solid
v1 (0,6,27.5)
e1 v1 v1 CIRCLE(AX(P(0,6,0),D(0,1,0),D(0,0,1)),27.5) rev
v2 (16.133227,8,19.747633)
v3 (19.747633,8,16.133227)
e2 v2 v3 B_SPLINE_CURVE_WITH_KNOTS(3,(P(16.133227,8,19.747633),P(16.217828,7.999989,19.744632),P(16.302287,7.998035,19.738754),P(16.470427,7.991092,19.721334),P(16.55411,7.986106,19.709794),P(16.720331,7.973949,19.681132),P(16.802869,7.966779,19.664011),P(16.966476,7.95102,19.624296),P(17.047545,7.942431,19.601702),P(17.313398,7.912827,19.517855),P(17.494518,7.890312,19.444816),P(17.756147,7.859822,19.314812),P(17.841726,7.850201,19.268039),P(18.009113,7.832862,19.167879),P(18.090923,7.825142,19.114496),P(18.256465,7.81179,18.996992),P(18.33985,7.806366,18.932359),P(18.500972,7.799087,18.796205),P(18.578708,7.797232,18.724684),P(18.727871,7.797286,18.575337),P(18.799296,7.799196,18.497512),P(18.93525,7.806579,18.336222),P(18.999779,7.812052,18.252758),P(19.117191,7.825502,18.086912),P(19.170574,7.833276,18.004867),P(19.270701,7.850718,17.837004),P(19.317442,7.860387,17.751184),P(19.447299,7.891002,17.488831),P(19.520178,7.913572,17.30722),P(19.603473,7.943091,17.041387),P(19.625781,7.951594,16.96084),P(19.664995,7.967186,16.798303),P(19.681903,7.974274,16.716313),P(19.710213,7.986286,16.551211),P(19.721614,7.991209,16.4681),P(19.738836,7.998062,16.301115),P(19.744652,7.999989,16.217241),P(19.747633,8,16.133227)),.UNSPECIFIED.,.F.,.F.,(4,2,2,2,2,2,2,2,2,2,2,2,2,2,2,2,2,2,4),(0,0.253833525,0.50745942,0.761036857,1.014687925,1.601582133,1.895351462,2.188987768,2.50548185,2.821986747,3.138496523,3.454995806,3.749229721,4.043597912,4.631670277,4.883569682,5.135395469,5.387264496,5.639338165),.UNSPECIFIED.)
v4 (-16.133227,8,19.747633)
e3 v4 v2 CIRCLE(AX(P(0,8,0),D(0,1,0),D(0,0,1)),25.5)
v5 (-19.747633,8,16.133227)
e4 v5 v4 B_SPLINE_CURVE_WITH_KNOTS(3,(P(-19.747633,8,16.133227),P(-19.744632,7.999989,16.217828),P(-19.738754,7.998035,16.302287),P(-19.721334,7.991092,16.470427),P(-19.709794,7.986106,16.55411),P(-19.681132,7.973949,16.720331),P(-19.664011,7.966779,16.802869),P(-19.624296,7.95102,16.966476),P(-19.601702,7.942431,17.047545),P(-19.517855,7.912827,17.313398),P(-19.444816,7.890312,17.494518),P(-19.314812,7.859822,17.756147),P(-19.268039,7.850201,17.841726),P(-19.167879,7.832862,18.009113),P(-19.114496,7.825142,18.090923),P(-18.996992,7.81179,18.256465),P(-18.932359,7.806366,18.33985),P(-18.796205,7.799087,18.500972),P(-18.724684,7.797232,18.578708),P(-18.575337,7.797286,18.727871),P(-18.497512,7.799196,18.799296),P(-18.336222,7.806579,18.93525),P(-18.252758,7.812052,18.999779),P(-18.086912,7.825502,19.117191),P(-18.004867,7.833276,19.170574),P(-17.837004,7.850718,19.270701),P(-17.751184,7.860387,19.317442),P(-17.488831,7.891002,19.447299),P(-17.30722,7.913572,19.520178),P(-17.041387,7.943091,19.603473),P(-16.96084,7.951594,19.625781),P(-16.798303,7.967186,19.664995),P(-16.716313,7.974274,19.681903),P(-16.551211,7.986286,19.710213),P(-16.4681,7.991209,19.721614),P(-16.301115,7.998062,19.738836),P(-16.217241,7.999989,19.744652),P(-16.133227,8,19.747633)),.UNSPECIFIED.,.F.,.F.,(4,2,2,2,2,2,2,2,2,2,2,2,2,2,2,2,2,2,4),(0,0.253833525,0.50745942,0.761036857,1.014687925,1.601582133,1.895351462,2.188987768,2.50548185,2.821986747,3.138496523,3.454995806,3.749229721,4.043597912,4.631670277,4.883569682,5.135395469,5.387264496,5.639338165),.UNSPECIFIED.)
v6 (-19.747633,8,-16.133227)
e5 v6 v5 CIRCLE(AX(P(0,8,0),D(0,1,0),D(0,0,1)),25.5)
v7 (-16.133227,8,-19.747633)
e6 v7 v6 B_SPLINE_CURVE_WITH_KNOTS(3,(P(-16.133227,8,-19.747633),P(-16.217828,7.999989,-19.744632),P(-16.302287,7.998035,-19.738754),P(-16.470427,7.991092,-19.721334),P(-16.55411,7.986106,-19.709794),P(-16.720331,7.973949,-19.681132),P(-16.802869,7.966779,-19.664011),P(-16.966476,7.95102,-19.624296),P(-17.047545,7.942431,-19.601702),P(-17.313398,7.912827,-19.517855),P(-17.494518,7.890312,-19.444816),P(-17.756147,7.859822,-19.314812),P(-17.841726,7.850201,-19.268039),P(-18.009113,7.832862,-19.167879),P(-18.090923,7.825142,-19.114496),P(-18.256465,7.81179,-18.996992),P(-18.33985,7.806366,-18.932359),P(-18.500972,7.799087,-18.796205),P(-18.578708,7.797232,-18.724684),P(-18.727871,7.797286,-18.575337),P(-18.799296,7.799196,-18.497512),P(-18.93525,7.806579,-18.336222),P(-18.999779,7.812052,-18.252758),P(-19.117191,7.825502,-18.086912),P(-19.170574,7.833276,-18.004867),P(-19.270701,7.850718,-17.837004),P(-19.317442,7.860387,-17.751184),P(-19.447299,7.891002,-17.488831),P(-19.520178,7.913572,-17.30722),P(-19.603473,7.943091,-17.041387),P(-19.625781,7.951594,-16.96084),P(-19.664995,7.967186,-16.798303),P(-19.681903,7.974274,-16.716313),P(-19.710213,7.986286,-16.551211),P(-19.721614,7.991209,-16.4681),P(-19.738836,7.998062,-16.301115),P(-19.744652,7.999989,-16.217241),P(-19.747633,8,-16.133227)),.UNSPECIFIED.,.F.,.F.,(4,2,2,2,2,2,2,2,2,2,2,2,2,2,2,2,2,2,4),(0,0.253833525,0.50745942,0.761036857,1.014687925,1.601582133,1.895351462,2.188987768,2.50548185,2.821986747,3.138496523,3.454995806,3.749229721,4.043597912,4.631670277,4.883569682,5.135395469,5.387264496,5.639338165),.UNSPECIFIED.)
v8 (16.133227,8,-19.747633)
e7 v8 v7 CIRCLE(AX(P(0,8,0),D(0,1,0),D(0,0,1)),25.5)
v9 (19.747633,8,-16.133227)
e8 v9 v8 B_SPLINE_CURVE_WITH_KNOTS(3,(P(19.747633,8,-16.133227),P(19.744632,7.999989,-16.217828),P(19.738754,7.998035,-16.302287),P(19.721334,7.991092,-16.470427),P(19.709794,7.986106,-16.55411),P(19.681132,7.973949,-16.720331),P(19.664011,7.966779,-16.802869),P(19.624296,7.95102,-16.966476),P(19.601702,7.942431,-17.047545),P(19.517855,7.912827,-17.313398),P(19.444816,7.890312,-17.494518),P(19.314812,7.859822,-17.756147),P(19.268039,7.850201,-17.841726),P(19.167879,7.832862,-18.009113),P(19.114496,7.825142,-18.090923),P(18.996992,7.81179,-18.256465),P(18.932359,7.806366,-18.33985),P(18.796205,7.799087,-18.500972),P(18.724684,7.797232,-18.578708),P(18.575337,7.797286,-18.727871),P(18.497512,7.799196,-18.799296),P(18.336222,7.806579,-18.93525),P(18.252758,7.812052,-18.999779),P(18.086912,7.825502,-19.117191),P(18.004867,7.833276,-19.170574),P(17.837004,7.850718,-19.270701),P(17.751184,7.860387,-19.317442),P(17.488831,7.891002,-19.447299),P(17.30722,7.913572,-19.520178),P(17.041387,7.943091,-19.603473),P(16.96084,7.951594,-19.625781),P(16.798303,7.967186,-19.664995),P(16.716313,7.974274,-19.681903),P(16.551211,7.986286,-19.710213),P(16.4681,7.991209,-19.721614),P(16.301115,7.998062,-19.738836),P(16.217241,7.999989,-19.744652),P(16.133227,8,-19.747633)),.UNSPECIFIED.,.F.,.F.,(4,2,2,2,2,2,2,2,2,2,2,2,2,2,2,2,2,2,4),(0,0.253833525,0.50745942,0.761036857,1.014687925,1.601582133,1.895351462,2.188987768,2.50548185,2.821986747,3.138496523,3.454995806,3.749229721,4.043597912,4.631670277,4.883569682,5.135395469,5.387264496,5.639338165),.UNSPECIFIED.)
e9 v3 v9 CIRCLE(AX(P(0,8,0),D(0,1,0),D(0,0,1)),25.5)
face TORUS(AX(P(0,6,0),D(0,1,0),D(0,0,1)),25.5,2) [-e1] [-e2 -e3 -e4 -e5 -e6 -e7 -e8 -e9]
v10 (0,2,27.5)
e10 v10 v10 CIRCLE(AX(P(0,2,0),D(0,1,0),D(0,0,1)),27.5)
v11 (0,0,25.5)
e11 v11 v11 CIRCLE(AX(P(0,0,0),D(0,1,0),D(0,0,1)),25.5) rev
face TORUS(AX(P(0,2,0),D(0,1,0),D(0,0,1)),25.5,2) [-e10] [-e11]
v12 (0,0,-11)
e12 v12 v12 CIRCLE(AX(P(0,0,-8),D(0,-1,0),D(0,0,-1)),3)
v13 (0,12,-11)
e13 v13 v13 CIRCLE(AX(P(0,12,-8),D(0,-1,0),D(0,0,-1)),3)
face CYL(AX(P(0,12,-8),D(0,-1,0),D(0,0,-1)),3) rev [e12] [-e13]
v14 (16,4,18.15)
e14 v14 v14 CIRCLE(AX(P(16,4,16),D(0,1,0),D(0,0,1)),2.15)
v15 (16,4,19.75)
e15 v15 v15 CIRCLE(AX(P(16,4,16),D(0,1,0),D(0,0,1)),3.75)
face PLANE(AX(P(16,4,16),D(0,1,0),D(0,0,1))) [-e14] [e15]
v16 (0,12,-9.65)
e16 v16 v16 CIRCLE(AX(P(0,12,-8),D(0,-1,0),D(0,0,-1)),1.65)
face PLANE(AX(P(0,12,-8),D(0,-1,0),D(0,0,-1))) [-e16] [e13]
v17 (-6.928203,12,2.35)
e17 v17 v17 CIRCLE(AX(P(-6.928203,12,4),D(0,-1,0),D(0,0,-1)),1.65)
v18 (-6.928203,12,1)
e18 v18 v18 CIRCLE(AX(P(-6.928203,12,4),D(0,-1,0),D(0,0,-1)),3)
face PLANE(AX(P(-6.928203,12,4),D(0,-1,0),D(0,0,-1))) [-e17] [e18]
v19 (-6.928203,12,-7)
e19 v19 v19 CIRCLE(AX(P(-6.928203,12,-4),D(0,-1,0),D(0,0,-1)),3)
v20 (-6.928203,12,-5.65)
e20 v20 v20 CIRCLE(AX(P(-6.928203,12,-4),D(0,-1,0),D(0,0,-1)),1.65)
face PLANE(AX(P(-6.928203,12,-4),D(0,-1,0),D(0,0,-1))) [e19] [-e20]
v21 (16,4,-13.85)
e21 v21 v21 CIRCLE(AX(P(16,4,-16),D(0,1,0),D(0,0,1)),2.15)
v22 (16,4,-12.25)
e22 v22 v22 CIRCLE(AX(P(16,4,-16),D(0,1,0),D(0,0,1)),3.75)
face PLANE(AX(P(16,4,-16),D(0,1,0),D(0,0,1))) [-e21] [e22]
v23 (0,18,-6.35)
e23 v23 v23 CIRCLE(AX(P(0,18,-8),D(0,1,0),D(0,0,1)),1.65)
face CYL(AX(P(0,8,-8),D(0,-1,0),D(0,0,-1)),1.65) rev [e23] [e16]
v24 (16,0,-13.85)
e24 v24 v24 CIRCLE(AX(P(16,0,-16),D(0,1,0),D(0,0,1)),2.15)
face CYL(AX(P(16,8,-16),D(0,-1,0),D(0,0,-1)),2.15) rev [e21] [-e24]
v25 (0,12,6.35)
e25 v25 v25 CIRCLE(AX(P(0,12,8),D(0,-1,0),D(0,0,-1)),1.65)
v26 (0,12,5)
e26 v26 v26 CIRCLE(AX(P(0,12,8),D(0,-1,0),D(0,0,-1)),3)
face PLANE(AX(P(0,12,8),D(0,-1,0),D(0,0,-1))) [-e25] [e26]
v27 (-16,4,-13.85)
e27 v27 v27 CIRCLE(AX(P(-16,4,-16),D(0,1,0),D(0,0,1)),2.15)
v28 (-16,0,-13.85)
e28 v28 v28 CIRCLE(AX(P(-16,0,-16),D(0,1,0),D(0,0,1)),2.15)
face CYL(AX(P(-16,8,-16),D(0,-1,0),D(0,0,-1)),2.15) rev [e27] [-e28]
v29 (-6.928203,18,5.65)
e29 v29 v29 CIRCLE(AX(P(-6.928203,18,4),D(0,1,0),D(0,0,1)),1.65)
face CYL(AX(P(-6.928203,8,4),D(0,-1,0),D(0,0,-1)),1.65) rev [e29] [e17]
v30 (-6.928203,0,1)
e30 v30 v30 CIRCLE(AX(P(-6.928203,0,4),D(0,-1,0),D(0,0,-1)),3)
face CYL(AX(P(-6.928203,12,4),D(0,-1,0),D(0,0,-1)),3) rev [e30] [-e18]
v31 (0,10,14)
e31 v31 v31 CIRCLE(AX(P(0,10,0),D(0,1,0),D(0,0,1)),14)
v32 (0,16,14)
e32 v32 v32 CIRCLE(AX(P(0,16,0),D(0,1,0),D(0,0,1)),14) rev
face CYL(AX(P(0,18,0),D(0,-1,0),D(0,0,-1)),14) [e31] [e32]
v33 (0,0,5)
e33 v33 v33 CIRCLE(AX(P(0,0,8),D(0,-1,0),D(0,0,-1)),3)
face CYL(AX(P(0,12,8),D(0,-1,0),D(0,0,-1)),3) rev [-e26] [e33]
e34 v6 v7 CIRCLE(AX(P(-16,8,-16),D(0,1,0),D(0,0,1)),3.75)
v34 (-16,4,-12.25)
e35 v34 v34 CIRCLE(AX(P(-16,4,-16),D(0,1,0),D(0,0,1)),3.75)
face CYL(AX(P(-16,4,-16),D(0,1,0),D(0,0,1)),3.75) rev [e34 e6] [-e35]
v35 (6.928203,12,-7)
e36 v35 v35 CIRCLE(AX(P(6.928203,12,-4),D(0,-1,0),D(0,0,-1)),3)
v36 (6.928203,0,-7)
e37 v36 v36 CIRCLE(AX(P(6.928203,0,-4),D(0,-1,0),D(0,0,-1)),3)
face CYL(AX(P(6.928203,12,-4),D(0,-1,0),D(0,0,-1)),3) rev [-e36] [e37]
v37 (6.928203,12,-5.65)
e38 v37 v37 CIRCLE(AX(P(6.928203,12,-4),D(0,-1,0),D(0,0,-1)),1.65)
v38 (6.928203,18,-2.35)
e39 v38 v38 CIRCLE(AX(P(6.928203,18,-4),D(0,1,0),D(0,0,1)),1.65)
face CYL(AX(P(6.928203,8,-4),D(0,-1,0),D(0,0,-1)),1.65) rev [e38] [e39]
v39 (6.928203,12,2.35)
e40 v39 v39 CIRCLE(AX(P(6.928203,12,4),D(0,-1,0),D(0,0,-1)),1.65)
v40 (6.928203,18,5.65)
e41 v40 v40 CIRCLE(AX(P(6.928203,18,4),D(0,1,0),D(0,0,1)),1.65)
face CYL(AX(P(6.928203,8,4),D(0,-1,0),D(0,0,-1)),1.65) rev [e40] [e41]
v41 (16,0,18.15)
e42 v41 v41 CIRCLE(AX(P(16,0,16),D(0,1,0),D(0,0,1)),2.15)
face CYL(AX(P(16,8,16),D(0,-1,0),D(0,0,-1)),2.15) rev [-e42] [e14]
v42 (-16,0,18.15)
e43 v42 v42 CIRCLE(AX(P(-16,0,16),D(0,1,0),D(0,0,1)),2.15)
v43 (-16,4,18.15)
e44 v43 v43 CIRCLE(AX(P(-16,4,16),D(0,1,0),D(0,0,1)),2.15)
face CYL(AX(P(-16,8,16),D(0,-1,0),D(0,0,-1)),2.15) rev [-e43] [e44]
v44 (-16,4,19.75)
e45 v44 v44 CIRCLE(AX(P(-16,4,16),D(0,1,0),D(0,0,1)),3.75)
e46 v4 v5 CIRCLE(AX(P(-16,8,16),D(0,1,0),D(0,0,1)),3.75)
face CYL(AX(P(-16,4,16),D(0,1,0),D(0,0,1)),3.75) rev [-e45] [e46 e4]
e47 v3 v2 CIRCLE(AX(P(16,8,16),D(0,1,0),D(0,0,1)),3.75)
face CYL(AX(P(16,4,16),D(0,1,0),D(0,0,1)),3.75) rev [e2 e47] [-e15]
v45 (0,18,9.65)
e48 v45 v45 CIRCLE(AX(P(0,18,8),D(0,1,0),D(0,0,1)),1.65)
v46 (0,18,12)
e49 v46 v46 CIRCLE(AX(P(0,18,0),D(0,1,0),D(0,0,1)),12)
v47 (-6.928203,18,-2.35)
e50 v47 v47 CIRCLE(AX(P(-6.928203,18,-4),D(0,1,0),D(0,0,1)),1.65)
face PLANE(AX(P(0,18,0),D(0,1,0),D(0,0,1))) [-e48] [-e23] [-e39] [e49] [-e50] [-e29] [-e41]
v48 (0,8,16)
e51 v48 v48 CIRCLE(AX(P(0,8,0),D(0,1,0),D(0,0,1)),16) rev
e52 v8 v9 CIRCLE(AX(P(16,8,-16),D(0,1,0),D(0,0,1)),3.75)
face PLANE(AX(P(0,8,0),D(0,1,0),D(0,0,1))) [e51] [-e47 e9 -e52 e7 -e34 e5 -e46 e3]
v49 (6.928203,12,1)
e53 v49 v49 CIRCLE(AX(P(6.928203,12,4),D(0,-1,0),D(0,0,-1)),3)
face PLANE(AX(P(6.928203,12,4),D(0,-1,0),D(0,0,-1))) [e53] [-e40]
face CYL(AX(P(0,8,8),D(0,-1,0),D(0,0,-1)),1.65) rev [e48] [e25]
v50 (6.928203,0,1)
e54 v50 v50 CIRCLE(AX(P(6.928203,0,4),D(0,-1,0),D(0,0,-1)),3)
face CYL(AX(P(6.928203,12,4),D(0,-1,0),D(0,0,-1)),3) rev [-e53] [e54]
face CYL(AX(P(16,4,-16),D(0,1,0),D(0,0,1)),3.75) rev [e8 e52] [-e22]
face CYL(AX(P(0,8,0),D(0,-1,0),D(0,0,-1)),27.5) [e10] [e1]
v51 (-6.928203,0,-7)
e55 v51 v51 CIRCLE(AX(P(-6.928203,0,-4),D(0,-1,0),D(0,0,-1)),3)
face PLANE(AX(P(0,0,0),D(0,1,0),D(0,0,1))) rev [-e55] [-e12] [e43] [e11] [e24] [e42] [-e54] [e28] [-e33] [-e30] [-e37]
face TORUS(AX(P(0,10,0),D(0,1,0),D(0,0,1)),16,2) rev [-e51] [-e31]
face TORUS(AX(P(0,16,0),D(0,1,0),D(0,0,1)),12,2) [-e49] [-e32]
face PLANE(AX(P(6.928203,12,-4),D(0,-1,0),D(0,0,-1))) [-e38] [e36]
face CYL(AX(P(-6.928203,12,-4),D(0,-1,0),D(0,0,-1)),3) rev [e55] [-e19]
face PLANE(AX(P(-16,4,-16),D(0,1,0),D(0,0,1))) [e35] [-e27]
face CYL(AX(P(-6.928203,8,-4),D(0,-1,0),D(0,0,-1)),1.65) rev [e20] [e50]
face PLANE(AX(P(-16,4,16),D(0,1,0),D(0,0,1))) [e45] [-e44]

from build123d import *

# Parameters (mm, degrees)
SKETCH1_R           = 27.5
SKETCH1_R_2         = 1.65
SKETCH1_R_3         = 2.15
BOSS_EXTRUDE1_DEPTH = 8
SKETCH2_R           = 14
SKETCH2_R_2         = 1.65
BOSS_EXTRUDE2_DEPTH = 10
SKETCH3_R           = 3
CUT_EXTRUDE1_DEPTH  = 12
SKETCH4_R           = 3.75
CUT_EXTRUDE2_DEPTH  = 4
FILLET1_R           = 2


with BuildPart() as part:
    # Sketch1 → Boss-Extrude1 (new body)
    with BuildSketch(Plane(origin=(0, 0, 0), x_dir=(1, 0, 0), z_dir=(0, 1, 0))):
        with Locations(Location((0, 0, 0), (0, 0, 270))):
            Circle(SKETCH1_R)
        with Locations(Location((-6.92820323, 4, 0), (0, 0, 270))):
            Circle(SKETCH1_R_2, mode=Mode.SUBTRACT)
        with Locations(Location((0, 8, 0), (0, 0, 270))):
            Circle(SKETCH1_R_2, mode=Mode.SUBTRACT)
        with Locations(Location((6.92820323, 4, 0), (0, 0, 270))):
            Circle(SKETCH1_R_2, mode=Mode.SUBTRACT)
        with Locations(Location((6.92820323, -4, 0), (0, 0, 270))):
            Circle(SKETCH1_R_2, mode=Mode.SUBTRACT)
        with Locations(Location((0, -8, 0), (0, 0, 270))):
            Circle(SKETCH1_R_2, mode=Mode.SUBTRACT)
        with Locations(Location((-6.92820323, -4, 0), (0, 0, 270))):
            Circle(SKETCH1_R_2, mode=Mode.SUBTRACT)
        with Locations(Location((-16, 16, 0), (0, 0, 270))):
            Circle(SKETCH1_R_3, mode=Mode.SUBTRACT)
        with Locations(Location((16, 16, 0), (0, 0, 270))):
            Circle(SKETCH1_R_3, mode=Mode.SUBTRACT)
        with Locations(Location((16, -16, 0), (0, 0, 270))):
            Circle(SKETCH1_R_3, mode=Mode.SUBTRACT)
        with Locations(Location((-16, -16, 0), (0, 0, 270))):
            Circle(SKETCH1_R_3, mode=Mode.SUBTRACT)
    extrude(amount=BOSS_EXTRUDE1_DEPTH)

    # Sketch2 → Boss-Extrude2 (add)
    with BuildSketch(Plane(origin=(0, 8, 0), x_dir=(1, 0, 0), z_dir=(0, 1, 0))):
        with Locations(Location((0, 0, 0), (0, 0, 270))):
            Circle(SKETCH2_R)
        with Locations(Location((-6.92820323, -4, 0), (0, 0, 270))):
            Circle(SKETCH2_R_2, mode=Mode.SUBTRACT)
        with Locations(Location((0, -8, 0), (0, 0, 270))):
            Circle(SKETCH2_R_2, mode=Mode.SUBTRACT)
        with Locations(Location((6.92820323, -4, 0), (0, 0, 270))):
            Circle(SKETCH2_R_2, mode=Mode.SUBTRACT)
        with Locations(Location((6.92820323, 4, 0), (0, 0, 270))):
            Circle(SKETCH2_R_2, mode=Mode.SUBTRACT)
        with Locations(Location((0, 8, 0), (0, 0, 270))):
            Circle(SKETCH2_R_2, mode=Mode.SUBTRACT)
        with Locations(Location((-6.92820323, 4, 0), (0, 0, 270))):
            Circle(SKETCH2_R_2, mode=Mode.SUBTRACT)
    extrude(amount=BOSS_EXTRUDE2_DEPTH)

    # Sketch3 → Cut-Extrude1 (cut)
    with BuildSketch(Plane.XZ):
        with Locations(Location((0, 8, 0), (0, 0, 270))):
            Circle(SKETCH3_R)
        with Locations(Location((6.92820323, 4, 0), (0, 0, 270))):
            Circle(SKETCH3_R)
        with Locations(Location((6.92820323, -4, 0), (0, 0, 270))):
            Circle(SKETCH3_R)
        with Locations(Location((0, -8, 0), (0, 0, 270))):
            Circle(SKETCH3_R)
        with Locations(Location((-6.92820323, -4, 0), (0, 0, 270))):
            Circle(SKETCH3_R)
        with Locations(Location((-6.92820323, 4, 0), (0, 0, 270))):
            Circle(SKETCH3_R)
    extrude(amount=-CUT_EXTRUDE1_DEPTH, mode=Mode.SUBTRACT)

    # Sketch4 → Cut-Extrude2 (cut)
    with BuildSketch(Plane(origin=(0, 8, 0), x_dir=(1, 0, 0), z_dir=(0, 1, 0))):
        with Locations(Location((-16, 16, 0), (0, 0, 270))):
            Circle(SKETCH4_R)
        with Locations(Location((16, 16, 0), (0, 0, 270))):
            Circle(SKETCH4_R)
        with Locations(Location((16, -16, 0), (0, 0, 270))):
            Circle(SKETCH4_R)
        with Locations(Location((-16, -16, 0), (0, 0, 270))):
            Circle(SKETCH4_R)
    extrude(amount=-CUT_EXTRUDE2_DEPTH, mode=Mode.SUBTRACT)

    # Fillet1
    # the kernel refuses this fillet: 2 mm, written as the material it adds along each edge
    with BuildSketch(Plane(origin=(0, 8, 0), x_dir=(0, 0, 1), z_dir=(-1, 0, 0))) as fillet1_piece_1:
        with BuildLine():
            CenterArc((14 + FILLET1_R, FILLET1_R), FILLET1_R, 180, 90)
            Line((14, FILLET1_R), (14, 0))
            Line((14, 0), (14 + FILLET1_R, 0))
        make_face()
    revolve(axis=Axis((0, 8, 0), (0, 1, 0)))
    # the kernel refuses this fillet: 2 mm, written as the material it takes off along each edge
    with BuildSketch(Plane(origin=(0, 0, 0), x_dir=(0, 0, 1), z_dir=(-1, 0, 0))) as fillet1_2_piece_1:
        with BuildLine():
            CenterArc((27.5 - FILLET1_R, FILLET1_R), FILLET1_R, 270, 90)
            Line((27.5 - FILLET1_R, 0), (27.5, 0))
            Line((27.5, 0), (27.5, FILLET1_R))
        make_face()
    revolve(axis=Axis((0, 0, 0), (0, 1, 0)), mode=Mode.SUBTRACT)
    with BuildSketch(Plane(origin=(0, 18, 0), x_dir=(0, 0, 1), z_dir=(-1, 0, 0))) as fillet1_2_piece_2:
        with BuildLine():
            CenterArc((14 - FILLET1_R, -FILLET1_R), FILLET1_R, 0, 90)
            Line((14 - FILLET1_R, 0), (14, 0))
            Line((14, 0), (14, -FILLET1_R))
        make_face()
    revolve(axis=Axis((0, 18, 0), (0, 1, 0)), mode=Mode.SUBTRACT)
    with BuildSketch(Plane(origin=(0, 8, 0), x_dir=(0, 0, 1), z_dir=(-1, 0, 0))) as fillet1_2_piece_3:
        with BuildLine():
            CenterArc((27.5 - FILLET1_R, -FILLET1_R), FILLET1_R, 0, 90)
            Line((27.5 - FILLET1_R, 0), (27.5, 0))
            Line((27.5, 0), (27.5, -FILLET1_R))
        make_face()
    revolve(axis=Axis((0, 8, 0), (0, 1, 0)), mode=Mode.SUBTRACT)


solid = part.part
